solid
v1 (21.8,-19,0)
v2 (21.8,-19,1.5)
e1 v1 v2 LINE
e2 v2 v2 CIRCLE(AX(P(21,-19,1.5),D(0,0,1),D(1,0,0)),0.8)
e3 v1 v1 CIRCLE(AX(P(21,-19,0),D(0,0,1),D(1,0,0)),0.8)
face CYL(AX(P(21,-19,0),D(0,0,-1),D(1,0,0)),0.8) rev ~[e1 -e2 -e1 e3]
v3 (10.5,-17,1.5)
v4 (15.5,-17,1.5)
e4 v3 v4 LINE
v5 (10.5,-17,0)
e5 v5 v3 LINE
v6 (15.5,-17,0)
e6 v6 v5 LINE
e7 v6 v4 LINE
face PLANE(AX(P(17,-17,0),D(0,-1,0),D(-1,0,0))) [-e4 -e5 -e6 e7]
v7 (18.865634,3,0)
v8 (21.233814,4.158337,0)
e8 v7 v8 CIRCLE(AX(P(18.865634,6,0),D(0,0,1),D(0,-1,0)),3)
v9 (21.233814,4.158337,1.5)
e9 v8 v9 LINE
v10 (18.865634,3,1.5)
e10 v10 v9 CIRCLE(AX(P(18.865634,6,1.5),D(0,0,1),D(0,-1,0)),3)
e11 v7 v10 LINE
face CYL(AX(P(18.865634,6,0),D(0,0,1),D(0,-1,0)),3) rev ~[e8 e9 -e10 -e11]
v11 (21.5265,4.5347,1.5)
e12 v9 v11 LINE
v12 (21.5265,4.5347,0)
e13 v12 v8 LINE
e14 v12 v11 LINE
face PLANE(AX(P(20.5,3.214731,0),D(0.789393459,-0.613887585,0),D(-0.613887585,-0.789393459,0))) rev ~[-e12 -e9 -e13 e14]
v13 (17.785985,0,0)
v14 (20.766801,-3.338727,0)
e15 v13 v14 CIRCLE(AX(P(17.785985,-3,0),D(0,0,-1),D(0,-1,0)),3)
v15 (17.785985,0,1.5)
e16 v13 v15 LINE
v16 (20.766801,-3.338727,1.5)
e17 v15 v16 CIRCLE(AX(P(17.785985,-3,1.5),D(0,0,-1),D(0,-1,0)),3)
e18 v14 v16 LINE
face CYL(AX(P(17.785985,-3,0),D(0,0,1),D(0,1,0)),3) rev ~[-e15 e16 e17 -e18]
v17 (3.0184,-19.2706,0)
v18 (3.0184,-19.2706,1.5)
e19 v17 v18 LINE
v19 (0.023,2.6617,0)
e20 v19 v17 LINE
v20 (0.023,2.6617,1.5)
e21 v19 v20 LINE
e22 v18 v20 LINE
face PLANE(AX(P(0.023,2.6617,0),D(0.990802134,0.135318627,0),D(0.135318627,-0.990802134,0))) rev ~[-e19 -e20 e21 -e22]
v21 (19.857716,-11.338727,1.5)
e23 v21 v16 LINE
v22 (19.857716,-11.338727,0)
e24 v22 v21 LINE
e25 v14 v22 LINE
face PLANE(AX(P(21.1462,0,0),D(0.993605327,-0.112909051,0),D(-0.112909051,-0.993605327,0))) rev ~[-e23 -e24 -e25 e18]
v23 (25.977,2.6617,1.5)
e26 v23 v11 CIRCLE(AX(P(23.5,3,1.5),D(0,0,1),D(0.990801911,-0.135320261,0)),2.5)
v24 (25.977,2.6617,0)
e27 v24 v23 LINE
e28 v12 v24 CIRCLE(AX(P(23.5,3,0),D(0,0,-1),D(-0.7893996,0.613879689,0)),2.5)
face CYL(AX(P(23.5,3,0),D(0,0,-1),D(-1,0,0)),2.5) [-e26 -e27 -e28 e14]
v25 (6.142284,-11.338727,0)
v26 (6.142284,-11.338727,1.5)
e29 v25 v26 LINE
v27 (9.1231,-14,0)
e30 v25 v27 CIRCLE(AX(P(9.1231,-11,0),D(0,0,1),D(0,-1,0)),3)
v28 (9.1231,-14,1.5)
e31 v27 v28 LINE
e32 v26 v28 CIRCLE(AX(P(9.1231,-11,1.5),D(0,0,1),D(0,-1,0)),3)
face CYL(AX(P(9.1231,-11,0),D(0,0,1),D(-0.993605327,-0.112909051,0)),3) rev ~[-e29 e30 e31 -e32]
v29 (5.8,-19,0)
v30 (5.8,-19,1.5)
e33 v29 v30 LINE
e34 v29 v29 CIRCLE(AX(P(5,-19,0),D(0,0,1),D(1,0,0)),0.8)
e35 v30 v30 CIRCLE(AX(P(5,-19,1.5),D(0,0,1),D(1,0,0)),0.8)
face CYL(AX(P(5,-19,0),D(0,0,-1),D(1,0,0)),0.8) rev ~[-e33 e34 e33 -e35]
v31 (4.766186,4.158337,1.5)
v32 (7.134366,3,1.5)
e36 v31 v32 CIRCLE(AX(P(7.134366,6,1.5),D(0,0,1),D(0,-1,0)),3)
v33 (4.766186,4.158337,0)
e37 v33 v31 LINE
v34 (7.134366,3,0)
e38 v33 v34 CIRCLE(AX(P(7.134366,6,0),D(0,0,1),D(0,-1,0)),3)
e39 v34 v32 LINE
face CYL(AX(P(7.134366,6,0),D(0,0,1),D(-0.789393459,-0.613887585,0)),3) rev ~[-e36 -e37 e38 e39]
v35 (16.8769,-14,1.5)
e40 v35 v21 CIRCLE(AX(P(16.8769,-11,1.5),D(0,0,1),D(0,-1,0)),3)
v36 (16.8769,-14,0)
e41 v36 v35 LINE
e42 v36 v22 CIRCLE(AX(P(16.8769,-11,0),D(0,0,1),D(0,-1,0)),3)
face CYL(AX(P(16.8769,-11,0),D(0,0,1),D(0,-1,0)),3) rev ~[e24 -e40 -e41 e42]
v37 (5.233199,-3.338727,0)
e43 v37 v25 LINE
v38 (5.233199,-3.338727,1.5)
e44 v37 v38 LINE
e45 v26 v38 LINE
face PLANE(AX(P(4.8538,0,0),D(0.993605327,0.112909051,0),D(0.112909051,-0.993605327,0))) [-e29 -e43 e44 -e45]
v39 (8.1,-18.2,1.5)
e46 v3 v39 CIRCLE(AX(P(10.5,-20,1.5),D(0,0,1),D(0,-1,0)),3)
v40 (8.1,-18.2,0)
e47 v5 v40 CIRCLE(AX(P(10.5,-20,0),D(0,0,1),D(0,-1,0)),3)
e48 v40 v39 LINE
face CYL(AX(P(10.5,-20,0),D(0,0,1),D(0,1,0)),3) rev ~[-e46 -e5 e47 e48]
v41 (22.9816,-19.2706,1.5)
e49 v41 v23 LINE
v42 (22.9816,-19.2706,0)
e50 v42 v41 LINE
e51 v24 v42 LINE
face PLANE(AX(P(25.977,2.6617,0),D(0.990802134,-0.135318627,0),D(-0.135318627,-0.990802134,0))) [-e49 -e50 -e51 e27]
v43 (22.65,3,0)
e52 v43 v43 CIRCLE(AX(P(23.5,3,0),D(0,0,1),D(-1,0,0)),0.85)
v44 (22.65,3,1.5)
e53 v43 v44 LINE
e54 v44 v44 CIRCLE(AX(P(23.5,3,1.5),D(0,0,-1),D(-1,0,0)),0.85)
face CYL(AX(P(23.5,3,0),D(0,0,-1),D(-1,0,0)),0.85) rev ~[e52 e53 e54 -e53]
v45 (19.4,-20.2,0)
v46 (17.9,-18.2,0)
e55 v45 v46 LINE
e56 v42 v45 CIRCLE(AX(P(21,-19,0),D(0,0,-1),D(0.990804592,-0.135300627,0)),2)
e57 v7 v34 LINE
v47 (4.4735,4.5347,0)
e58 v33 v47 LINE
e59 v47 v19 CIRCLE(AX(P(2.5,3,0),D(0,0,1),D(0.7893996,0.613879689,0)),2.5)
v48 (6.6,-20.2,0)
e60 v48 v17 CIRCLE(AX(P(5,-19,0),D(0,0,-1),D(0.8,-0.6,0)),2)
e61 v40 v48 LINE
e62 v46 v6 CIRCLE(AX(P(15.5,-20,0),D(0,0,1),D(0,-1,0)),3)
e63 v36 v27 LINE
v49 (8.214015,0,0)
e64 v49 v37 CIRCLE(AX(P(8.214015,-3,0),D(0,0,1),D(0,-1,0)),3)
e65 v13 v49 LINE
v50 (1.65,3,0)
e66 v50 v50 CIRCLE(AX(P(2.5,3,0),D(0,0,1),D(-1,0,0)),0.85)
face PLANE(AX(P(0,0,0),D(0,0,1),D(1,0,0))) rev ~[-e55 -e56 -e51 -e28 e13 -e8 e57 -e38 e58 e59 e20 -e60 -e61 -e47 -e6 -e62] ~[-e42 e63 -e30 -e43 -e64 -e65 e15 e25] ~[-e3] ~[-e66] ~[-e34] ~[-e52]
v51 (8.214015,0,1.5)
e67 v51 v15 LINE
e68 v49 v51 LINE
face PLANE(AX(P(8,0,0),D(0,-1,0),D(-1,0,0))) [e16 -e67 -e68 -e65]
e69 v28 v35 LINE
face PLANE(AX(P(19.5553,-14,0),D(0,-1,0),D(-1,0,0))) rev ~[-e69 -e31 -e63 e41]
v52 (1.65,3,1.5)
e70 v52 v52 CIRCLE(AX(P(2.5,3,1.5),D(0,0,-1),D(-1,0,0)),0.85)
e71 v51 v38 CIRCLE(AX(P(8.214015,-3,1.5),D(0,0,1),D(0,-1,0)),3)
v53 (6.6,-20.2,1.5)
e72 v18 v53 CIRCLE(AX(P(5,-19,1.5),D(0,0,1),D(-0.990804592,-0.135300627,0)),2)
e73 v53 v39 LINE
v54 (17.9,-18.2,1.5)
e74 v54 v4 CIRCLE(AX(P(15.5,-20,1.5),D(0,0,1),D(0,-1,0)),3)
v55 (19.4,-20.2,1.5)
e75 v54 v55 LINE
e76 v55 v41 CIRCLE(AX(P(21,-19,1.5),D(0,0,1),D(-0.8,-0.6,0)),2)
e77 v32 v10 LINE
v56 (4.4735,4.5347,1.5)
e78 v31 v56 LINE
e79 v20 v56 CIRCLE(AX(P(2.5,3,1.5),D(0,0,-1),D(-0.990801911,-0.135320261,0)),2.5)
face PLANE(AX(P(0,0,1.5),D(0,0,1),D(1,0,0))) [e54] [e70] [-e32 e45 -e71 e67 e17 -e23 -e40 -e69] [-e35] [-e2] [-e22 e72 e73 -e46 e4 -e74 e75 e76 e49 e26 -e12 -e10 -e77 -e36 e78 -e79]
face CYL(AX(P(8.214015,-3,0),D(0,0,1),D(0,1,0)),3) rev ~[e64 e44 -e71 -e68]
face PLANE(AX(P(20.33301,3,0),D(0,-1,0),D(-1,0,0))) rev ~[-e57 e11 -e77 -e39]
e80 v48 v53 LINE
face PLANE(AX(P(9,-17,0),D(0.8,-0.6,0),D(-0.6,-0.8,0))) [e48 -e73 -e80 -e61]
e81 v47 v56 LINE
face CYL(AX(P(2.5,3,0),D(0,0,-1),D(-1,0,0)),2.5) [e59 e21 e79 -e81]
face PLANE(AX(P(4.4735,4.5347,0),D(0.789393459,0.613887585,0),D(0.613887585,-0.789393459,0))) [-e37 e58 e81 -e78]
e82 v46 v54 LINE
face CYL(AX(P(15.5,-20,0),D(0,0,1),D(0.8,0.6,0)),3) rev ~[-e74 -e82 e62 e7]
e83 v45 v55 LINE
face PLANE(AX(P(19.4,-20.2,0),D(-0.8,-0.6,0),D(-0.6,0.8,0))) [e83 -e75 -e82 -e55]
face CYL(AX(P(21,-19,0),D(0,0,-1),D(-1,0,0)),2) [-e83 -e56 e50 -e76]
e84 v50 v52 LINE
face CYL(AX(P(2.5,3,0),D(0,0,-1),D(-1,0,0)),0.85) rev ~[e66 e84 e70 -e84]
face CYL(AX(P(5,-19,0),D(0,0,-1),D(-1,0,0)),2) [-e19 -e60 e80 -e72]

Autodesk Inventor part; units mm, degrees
ref_plane "YZ Plane" through (0, 0, 0) normal (1, 0, 0) x (0, 1, 0)
ref_plane "XZ Plane" through (0, 0, 0) normal (0, 1, 0) x (-1, 0, 0)
ref_plane "XY Plane" through (0, 0, 0) normal (0, 0, 1) x (1, 0, 0)
sketch "スケッチ2" plane through (0, 0, 0) normal (0, 0, 1) x (1, 0, 0)
  line L0 (0, 0) -> (26, 0)
  line L1 (26, 0) -> (26, 33)
  line L2 (26, 33) -> (0, 33)
  line L3 (0, 33) -> (0, 0)
  line L4 (0, 0) -> (26, 0)
  line L5 (26, 0) -> (26, 24)
  line L6 (26, 24) -> (0, 24) construction
  line L7 (0, 24) -> (0, 0)
  circle A0 centre (13, 24) radius 13
  circle A1 centre (13, 24) radius 6.25
  line L8 (26, 0) -> (0, 0)
  line L9 (26, 24.5219) -> (26, -21)
  line L10 (26, -21) -> (0, -21)
  line L11 (0, -21) -> (0, 24)
  circle A2 centre (5, -19) radius 0.8
  circle A3 centre (21, -19) radius 0.8
  line L12 (0, 24) -> (26, 24)
  point P0 (22.3808, 33)
  point P1 (3.6192, 33)
  point P2 (0, 0)
  point P3 (26, 24)
  point P4 (0, 24)
  point P5 (6.75, 24)
  point P6 (19, 22.25)
  point P7 (19.25, 24)
  dimension "d0" = 26
  dimension "d1" = 33
  dimension "d2" = 24
  dimension "d3" = 12.5
  dimension "d14" = 26
  dimension "d17" = 1.6
  dimension "d18" = 1.6
  dimension "d19" = 2
  dimension "d20" = 2
  dimension "d21" = 5
  dimension "d22" = 5
  dimension "d23" = 13
  dimension "d25" = 45
  dimension "d26" = 0
extrude "押し出し1" add sketch "スケッチ2" along normal blind 1.5 contours L3 A0 L1 L0 | L0 L9 L10 L11 | L12 A1 A0 | A0 L2 L12 A1 | A0 L2 L1 | L12 A1 | A1 L12
sketch "スケッチ3" plane through (0, 0, 0) normal (0, 0, -1) x (-1, 0, 0)
  circle A0 centre (-2.5, 24) radius 0.85 projected
  circle A1 centre (-23.5, 24) radius 0.85 projected
  circle A2 centre (-23.5, 3) radius 0.85 projected
  circle A3 centre (-2.5, 3) radius 0.85 projected
  circle A4 centre (-13, 24) radius 6.25 projected
  line L0 (-2.5, 24) -> (-23.5, 24)
  line L1 (-23.5, 24) -> (-23.5, 3)
  line L2 (-23.5, 3) -> (-2.5, 3)
  line L3 (-2.5, 3) -> (-2.5, 24)
  circle A5 centre (-13, 24) radius 10.25
  line L4 (-5.5, 24) -> (-20.5, 24)
  line L5 (-20.5, 24) -> (-20.5, 3)
  line L6 (-20.5, 3) -> (-5.5, 3)
  line L7 (-5.5, 3) -> (-5.5, 24)
  arc A6 (0, 24) -> (-3.6192, 33) centre (-13, 24) ccw projected
  line L8 (-26, 33) -> (-3.6192, 33) projected
  line L9 (-26, -21) -> (-26, 33) projected
  line L10 (0, -21) -> (-26, -21) projected
  line L11 (0, 24) -> (0, -21) projected
  circle A7 centre (-5, -19) radius 0.8 projected
  circle A8 centre (-21, -19) radius 0.8 projected
  line L12 (-37.149, 0) -> (-22.2321, 0)
  line L13 (-22.2321, 0) -> (-8, 0)
  circle A9 centre (-23.5, 3) radius 2.5
  circle A10 centre (-2.5, 3) radius 2.5
  line L14 (-21.5265, 4.5347) -> (-18, 0)
  line L15 (-4.4735, 4.5347) -> (-8, 0)
  line L16 (-18, 0) -> (-8, 0)
  circle A11 centre (-21, -19) radius 2
  circle A12 centre (-5, -19) radius 2
  line L17 (-26, -21) -> (-26, 33) projected
  line L18 (-19.4, -20.2) -> (-17, -17)
  line L19 (-17, -17) -> (-9, -17)
  line L20 (-9, -17) -> (-6.6, -20.2)
  line L21 (-25.977, 2.6617) -> (-22.9816, -19.2706)
  line L22 (-0.023, 2.6617) -> (-3.0184, -19.2706)
  line L23 (-23.5, 3) -> (-21, -19)
  line L24 (-2.5, 3) -> (-5, -19)
  line L25 (-23.1591, 0) -> (-2.8409, 0)
  line L26 (-21.5682, -14) -> (-4.4318, -14)
  line L27 (-21.1462, 0) -> (-19.5553, -14)
  line L28 (-4.8538, 0) -> (-6.4447, -14)
  point P0 (0, 0)
  point P1 (-5.5, 17.0134)
  point P2 (-20.5, 17.0134)
  point P3 (-13, 0)
  point P4 (-13, -21)
  point P5 (-13, -17)
  point P6 (-21, -21)
  point P7 (-5, -21)
  point P8 (-25.6135, 0)
  point P9 (-26, 0)
  point P10 (0, 3)
  point P11 (-8.0946, 33)
  point P12 (-17.9054, 33)
  point P13 (-26, 3)
  point P14 (-20.5, 3.2147)
  point P15 (-5.5, 3.2147)
  point P16 (-3.35, 3)
  point P17 (-2.5, 3.85)
  point P18 (-2.5, 5.5)
  point P19 (-23.5, 5.5)
  point P20 (-23.5, 3.85)
  point P21 (-22.65, 3)
  point P22 (-5.667, 3)
  point P23 (-20.333, 3)
  dimension "d27" = 4
  dimension "d28" = 3
  dimension "d29" = 3
  dimension "d36" = 3
  dimension "d38" = 10
  dimension "d39" = 8
  dimension "d40" = 3
  dimension "d41" = 3
  dimension "d42" = 2
  dimension "d43" = 2
extrude "押し出し2" cut sketch "スケッチ3" against normal through all contours A0 L3 L0 A5 | A0 A5 L8 A6 L11 A10 L3 | A5 L0 A0 | A0 L0 A4 A1 A5 L8 | L3 A10 L15 L7 A5 A0 | A0 A5 L0 L3 | L0 A5 A0 | A0 A5 L7 L0 | L8 A5 | L7 A5 L5 L0 A4 | A5 A1 L1 A9 L9 L8 | L7 L15 L2 L14 L5 A5 | L3 L2 A3 | A3 L24 L3 | L11 L10 A12 L22 A10 | L0 A4 | A4 L0 | A5 L0 L1 A1 | A1 L0 A5 | L5 L14 A9 L1 A1 A5 | A5 A1 L0 L5 | L2 L24 A3 | A1 A5 L0 | L1 L0 A5 A1 | A9 L21 L12 L9 | L10 A11 L18 L19 L20 A12 | L12 L21 A11 L10 L9 | L25 L28 L26 L27 L13 | L1 L23 A2 | A2 L2 L1 | A2 L23 L2
fillet "フィレット1" radius 3 8 edges at (4.8538, 0, 0.75) (21.1462, 0, 0.75) (19.5553, -14, 0.75) (6.4447, -14, 0.75) (9, -17, 0.75) (17, -17, 0.75) (20.333, 3, 0.75) (5.667, 3, 0.75)
equation "\"d20\" = d19"
properties part number "elbow" material "アルミニウム 6061"
